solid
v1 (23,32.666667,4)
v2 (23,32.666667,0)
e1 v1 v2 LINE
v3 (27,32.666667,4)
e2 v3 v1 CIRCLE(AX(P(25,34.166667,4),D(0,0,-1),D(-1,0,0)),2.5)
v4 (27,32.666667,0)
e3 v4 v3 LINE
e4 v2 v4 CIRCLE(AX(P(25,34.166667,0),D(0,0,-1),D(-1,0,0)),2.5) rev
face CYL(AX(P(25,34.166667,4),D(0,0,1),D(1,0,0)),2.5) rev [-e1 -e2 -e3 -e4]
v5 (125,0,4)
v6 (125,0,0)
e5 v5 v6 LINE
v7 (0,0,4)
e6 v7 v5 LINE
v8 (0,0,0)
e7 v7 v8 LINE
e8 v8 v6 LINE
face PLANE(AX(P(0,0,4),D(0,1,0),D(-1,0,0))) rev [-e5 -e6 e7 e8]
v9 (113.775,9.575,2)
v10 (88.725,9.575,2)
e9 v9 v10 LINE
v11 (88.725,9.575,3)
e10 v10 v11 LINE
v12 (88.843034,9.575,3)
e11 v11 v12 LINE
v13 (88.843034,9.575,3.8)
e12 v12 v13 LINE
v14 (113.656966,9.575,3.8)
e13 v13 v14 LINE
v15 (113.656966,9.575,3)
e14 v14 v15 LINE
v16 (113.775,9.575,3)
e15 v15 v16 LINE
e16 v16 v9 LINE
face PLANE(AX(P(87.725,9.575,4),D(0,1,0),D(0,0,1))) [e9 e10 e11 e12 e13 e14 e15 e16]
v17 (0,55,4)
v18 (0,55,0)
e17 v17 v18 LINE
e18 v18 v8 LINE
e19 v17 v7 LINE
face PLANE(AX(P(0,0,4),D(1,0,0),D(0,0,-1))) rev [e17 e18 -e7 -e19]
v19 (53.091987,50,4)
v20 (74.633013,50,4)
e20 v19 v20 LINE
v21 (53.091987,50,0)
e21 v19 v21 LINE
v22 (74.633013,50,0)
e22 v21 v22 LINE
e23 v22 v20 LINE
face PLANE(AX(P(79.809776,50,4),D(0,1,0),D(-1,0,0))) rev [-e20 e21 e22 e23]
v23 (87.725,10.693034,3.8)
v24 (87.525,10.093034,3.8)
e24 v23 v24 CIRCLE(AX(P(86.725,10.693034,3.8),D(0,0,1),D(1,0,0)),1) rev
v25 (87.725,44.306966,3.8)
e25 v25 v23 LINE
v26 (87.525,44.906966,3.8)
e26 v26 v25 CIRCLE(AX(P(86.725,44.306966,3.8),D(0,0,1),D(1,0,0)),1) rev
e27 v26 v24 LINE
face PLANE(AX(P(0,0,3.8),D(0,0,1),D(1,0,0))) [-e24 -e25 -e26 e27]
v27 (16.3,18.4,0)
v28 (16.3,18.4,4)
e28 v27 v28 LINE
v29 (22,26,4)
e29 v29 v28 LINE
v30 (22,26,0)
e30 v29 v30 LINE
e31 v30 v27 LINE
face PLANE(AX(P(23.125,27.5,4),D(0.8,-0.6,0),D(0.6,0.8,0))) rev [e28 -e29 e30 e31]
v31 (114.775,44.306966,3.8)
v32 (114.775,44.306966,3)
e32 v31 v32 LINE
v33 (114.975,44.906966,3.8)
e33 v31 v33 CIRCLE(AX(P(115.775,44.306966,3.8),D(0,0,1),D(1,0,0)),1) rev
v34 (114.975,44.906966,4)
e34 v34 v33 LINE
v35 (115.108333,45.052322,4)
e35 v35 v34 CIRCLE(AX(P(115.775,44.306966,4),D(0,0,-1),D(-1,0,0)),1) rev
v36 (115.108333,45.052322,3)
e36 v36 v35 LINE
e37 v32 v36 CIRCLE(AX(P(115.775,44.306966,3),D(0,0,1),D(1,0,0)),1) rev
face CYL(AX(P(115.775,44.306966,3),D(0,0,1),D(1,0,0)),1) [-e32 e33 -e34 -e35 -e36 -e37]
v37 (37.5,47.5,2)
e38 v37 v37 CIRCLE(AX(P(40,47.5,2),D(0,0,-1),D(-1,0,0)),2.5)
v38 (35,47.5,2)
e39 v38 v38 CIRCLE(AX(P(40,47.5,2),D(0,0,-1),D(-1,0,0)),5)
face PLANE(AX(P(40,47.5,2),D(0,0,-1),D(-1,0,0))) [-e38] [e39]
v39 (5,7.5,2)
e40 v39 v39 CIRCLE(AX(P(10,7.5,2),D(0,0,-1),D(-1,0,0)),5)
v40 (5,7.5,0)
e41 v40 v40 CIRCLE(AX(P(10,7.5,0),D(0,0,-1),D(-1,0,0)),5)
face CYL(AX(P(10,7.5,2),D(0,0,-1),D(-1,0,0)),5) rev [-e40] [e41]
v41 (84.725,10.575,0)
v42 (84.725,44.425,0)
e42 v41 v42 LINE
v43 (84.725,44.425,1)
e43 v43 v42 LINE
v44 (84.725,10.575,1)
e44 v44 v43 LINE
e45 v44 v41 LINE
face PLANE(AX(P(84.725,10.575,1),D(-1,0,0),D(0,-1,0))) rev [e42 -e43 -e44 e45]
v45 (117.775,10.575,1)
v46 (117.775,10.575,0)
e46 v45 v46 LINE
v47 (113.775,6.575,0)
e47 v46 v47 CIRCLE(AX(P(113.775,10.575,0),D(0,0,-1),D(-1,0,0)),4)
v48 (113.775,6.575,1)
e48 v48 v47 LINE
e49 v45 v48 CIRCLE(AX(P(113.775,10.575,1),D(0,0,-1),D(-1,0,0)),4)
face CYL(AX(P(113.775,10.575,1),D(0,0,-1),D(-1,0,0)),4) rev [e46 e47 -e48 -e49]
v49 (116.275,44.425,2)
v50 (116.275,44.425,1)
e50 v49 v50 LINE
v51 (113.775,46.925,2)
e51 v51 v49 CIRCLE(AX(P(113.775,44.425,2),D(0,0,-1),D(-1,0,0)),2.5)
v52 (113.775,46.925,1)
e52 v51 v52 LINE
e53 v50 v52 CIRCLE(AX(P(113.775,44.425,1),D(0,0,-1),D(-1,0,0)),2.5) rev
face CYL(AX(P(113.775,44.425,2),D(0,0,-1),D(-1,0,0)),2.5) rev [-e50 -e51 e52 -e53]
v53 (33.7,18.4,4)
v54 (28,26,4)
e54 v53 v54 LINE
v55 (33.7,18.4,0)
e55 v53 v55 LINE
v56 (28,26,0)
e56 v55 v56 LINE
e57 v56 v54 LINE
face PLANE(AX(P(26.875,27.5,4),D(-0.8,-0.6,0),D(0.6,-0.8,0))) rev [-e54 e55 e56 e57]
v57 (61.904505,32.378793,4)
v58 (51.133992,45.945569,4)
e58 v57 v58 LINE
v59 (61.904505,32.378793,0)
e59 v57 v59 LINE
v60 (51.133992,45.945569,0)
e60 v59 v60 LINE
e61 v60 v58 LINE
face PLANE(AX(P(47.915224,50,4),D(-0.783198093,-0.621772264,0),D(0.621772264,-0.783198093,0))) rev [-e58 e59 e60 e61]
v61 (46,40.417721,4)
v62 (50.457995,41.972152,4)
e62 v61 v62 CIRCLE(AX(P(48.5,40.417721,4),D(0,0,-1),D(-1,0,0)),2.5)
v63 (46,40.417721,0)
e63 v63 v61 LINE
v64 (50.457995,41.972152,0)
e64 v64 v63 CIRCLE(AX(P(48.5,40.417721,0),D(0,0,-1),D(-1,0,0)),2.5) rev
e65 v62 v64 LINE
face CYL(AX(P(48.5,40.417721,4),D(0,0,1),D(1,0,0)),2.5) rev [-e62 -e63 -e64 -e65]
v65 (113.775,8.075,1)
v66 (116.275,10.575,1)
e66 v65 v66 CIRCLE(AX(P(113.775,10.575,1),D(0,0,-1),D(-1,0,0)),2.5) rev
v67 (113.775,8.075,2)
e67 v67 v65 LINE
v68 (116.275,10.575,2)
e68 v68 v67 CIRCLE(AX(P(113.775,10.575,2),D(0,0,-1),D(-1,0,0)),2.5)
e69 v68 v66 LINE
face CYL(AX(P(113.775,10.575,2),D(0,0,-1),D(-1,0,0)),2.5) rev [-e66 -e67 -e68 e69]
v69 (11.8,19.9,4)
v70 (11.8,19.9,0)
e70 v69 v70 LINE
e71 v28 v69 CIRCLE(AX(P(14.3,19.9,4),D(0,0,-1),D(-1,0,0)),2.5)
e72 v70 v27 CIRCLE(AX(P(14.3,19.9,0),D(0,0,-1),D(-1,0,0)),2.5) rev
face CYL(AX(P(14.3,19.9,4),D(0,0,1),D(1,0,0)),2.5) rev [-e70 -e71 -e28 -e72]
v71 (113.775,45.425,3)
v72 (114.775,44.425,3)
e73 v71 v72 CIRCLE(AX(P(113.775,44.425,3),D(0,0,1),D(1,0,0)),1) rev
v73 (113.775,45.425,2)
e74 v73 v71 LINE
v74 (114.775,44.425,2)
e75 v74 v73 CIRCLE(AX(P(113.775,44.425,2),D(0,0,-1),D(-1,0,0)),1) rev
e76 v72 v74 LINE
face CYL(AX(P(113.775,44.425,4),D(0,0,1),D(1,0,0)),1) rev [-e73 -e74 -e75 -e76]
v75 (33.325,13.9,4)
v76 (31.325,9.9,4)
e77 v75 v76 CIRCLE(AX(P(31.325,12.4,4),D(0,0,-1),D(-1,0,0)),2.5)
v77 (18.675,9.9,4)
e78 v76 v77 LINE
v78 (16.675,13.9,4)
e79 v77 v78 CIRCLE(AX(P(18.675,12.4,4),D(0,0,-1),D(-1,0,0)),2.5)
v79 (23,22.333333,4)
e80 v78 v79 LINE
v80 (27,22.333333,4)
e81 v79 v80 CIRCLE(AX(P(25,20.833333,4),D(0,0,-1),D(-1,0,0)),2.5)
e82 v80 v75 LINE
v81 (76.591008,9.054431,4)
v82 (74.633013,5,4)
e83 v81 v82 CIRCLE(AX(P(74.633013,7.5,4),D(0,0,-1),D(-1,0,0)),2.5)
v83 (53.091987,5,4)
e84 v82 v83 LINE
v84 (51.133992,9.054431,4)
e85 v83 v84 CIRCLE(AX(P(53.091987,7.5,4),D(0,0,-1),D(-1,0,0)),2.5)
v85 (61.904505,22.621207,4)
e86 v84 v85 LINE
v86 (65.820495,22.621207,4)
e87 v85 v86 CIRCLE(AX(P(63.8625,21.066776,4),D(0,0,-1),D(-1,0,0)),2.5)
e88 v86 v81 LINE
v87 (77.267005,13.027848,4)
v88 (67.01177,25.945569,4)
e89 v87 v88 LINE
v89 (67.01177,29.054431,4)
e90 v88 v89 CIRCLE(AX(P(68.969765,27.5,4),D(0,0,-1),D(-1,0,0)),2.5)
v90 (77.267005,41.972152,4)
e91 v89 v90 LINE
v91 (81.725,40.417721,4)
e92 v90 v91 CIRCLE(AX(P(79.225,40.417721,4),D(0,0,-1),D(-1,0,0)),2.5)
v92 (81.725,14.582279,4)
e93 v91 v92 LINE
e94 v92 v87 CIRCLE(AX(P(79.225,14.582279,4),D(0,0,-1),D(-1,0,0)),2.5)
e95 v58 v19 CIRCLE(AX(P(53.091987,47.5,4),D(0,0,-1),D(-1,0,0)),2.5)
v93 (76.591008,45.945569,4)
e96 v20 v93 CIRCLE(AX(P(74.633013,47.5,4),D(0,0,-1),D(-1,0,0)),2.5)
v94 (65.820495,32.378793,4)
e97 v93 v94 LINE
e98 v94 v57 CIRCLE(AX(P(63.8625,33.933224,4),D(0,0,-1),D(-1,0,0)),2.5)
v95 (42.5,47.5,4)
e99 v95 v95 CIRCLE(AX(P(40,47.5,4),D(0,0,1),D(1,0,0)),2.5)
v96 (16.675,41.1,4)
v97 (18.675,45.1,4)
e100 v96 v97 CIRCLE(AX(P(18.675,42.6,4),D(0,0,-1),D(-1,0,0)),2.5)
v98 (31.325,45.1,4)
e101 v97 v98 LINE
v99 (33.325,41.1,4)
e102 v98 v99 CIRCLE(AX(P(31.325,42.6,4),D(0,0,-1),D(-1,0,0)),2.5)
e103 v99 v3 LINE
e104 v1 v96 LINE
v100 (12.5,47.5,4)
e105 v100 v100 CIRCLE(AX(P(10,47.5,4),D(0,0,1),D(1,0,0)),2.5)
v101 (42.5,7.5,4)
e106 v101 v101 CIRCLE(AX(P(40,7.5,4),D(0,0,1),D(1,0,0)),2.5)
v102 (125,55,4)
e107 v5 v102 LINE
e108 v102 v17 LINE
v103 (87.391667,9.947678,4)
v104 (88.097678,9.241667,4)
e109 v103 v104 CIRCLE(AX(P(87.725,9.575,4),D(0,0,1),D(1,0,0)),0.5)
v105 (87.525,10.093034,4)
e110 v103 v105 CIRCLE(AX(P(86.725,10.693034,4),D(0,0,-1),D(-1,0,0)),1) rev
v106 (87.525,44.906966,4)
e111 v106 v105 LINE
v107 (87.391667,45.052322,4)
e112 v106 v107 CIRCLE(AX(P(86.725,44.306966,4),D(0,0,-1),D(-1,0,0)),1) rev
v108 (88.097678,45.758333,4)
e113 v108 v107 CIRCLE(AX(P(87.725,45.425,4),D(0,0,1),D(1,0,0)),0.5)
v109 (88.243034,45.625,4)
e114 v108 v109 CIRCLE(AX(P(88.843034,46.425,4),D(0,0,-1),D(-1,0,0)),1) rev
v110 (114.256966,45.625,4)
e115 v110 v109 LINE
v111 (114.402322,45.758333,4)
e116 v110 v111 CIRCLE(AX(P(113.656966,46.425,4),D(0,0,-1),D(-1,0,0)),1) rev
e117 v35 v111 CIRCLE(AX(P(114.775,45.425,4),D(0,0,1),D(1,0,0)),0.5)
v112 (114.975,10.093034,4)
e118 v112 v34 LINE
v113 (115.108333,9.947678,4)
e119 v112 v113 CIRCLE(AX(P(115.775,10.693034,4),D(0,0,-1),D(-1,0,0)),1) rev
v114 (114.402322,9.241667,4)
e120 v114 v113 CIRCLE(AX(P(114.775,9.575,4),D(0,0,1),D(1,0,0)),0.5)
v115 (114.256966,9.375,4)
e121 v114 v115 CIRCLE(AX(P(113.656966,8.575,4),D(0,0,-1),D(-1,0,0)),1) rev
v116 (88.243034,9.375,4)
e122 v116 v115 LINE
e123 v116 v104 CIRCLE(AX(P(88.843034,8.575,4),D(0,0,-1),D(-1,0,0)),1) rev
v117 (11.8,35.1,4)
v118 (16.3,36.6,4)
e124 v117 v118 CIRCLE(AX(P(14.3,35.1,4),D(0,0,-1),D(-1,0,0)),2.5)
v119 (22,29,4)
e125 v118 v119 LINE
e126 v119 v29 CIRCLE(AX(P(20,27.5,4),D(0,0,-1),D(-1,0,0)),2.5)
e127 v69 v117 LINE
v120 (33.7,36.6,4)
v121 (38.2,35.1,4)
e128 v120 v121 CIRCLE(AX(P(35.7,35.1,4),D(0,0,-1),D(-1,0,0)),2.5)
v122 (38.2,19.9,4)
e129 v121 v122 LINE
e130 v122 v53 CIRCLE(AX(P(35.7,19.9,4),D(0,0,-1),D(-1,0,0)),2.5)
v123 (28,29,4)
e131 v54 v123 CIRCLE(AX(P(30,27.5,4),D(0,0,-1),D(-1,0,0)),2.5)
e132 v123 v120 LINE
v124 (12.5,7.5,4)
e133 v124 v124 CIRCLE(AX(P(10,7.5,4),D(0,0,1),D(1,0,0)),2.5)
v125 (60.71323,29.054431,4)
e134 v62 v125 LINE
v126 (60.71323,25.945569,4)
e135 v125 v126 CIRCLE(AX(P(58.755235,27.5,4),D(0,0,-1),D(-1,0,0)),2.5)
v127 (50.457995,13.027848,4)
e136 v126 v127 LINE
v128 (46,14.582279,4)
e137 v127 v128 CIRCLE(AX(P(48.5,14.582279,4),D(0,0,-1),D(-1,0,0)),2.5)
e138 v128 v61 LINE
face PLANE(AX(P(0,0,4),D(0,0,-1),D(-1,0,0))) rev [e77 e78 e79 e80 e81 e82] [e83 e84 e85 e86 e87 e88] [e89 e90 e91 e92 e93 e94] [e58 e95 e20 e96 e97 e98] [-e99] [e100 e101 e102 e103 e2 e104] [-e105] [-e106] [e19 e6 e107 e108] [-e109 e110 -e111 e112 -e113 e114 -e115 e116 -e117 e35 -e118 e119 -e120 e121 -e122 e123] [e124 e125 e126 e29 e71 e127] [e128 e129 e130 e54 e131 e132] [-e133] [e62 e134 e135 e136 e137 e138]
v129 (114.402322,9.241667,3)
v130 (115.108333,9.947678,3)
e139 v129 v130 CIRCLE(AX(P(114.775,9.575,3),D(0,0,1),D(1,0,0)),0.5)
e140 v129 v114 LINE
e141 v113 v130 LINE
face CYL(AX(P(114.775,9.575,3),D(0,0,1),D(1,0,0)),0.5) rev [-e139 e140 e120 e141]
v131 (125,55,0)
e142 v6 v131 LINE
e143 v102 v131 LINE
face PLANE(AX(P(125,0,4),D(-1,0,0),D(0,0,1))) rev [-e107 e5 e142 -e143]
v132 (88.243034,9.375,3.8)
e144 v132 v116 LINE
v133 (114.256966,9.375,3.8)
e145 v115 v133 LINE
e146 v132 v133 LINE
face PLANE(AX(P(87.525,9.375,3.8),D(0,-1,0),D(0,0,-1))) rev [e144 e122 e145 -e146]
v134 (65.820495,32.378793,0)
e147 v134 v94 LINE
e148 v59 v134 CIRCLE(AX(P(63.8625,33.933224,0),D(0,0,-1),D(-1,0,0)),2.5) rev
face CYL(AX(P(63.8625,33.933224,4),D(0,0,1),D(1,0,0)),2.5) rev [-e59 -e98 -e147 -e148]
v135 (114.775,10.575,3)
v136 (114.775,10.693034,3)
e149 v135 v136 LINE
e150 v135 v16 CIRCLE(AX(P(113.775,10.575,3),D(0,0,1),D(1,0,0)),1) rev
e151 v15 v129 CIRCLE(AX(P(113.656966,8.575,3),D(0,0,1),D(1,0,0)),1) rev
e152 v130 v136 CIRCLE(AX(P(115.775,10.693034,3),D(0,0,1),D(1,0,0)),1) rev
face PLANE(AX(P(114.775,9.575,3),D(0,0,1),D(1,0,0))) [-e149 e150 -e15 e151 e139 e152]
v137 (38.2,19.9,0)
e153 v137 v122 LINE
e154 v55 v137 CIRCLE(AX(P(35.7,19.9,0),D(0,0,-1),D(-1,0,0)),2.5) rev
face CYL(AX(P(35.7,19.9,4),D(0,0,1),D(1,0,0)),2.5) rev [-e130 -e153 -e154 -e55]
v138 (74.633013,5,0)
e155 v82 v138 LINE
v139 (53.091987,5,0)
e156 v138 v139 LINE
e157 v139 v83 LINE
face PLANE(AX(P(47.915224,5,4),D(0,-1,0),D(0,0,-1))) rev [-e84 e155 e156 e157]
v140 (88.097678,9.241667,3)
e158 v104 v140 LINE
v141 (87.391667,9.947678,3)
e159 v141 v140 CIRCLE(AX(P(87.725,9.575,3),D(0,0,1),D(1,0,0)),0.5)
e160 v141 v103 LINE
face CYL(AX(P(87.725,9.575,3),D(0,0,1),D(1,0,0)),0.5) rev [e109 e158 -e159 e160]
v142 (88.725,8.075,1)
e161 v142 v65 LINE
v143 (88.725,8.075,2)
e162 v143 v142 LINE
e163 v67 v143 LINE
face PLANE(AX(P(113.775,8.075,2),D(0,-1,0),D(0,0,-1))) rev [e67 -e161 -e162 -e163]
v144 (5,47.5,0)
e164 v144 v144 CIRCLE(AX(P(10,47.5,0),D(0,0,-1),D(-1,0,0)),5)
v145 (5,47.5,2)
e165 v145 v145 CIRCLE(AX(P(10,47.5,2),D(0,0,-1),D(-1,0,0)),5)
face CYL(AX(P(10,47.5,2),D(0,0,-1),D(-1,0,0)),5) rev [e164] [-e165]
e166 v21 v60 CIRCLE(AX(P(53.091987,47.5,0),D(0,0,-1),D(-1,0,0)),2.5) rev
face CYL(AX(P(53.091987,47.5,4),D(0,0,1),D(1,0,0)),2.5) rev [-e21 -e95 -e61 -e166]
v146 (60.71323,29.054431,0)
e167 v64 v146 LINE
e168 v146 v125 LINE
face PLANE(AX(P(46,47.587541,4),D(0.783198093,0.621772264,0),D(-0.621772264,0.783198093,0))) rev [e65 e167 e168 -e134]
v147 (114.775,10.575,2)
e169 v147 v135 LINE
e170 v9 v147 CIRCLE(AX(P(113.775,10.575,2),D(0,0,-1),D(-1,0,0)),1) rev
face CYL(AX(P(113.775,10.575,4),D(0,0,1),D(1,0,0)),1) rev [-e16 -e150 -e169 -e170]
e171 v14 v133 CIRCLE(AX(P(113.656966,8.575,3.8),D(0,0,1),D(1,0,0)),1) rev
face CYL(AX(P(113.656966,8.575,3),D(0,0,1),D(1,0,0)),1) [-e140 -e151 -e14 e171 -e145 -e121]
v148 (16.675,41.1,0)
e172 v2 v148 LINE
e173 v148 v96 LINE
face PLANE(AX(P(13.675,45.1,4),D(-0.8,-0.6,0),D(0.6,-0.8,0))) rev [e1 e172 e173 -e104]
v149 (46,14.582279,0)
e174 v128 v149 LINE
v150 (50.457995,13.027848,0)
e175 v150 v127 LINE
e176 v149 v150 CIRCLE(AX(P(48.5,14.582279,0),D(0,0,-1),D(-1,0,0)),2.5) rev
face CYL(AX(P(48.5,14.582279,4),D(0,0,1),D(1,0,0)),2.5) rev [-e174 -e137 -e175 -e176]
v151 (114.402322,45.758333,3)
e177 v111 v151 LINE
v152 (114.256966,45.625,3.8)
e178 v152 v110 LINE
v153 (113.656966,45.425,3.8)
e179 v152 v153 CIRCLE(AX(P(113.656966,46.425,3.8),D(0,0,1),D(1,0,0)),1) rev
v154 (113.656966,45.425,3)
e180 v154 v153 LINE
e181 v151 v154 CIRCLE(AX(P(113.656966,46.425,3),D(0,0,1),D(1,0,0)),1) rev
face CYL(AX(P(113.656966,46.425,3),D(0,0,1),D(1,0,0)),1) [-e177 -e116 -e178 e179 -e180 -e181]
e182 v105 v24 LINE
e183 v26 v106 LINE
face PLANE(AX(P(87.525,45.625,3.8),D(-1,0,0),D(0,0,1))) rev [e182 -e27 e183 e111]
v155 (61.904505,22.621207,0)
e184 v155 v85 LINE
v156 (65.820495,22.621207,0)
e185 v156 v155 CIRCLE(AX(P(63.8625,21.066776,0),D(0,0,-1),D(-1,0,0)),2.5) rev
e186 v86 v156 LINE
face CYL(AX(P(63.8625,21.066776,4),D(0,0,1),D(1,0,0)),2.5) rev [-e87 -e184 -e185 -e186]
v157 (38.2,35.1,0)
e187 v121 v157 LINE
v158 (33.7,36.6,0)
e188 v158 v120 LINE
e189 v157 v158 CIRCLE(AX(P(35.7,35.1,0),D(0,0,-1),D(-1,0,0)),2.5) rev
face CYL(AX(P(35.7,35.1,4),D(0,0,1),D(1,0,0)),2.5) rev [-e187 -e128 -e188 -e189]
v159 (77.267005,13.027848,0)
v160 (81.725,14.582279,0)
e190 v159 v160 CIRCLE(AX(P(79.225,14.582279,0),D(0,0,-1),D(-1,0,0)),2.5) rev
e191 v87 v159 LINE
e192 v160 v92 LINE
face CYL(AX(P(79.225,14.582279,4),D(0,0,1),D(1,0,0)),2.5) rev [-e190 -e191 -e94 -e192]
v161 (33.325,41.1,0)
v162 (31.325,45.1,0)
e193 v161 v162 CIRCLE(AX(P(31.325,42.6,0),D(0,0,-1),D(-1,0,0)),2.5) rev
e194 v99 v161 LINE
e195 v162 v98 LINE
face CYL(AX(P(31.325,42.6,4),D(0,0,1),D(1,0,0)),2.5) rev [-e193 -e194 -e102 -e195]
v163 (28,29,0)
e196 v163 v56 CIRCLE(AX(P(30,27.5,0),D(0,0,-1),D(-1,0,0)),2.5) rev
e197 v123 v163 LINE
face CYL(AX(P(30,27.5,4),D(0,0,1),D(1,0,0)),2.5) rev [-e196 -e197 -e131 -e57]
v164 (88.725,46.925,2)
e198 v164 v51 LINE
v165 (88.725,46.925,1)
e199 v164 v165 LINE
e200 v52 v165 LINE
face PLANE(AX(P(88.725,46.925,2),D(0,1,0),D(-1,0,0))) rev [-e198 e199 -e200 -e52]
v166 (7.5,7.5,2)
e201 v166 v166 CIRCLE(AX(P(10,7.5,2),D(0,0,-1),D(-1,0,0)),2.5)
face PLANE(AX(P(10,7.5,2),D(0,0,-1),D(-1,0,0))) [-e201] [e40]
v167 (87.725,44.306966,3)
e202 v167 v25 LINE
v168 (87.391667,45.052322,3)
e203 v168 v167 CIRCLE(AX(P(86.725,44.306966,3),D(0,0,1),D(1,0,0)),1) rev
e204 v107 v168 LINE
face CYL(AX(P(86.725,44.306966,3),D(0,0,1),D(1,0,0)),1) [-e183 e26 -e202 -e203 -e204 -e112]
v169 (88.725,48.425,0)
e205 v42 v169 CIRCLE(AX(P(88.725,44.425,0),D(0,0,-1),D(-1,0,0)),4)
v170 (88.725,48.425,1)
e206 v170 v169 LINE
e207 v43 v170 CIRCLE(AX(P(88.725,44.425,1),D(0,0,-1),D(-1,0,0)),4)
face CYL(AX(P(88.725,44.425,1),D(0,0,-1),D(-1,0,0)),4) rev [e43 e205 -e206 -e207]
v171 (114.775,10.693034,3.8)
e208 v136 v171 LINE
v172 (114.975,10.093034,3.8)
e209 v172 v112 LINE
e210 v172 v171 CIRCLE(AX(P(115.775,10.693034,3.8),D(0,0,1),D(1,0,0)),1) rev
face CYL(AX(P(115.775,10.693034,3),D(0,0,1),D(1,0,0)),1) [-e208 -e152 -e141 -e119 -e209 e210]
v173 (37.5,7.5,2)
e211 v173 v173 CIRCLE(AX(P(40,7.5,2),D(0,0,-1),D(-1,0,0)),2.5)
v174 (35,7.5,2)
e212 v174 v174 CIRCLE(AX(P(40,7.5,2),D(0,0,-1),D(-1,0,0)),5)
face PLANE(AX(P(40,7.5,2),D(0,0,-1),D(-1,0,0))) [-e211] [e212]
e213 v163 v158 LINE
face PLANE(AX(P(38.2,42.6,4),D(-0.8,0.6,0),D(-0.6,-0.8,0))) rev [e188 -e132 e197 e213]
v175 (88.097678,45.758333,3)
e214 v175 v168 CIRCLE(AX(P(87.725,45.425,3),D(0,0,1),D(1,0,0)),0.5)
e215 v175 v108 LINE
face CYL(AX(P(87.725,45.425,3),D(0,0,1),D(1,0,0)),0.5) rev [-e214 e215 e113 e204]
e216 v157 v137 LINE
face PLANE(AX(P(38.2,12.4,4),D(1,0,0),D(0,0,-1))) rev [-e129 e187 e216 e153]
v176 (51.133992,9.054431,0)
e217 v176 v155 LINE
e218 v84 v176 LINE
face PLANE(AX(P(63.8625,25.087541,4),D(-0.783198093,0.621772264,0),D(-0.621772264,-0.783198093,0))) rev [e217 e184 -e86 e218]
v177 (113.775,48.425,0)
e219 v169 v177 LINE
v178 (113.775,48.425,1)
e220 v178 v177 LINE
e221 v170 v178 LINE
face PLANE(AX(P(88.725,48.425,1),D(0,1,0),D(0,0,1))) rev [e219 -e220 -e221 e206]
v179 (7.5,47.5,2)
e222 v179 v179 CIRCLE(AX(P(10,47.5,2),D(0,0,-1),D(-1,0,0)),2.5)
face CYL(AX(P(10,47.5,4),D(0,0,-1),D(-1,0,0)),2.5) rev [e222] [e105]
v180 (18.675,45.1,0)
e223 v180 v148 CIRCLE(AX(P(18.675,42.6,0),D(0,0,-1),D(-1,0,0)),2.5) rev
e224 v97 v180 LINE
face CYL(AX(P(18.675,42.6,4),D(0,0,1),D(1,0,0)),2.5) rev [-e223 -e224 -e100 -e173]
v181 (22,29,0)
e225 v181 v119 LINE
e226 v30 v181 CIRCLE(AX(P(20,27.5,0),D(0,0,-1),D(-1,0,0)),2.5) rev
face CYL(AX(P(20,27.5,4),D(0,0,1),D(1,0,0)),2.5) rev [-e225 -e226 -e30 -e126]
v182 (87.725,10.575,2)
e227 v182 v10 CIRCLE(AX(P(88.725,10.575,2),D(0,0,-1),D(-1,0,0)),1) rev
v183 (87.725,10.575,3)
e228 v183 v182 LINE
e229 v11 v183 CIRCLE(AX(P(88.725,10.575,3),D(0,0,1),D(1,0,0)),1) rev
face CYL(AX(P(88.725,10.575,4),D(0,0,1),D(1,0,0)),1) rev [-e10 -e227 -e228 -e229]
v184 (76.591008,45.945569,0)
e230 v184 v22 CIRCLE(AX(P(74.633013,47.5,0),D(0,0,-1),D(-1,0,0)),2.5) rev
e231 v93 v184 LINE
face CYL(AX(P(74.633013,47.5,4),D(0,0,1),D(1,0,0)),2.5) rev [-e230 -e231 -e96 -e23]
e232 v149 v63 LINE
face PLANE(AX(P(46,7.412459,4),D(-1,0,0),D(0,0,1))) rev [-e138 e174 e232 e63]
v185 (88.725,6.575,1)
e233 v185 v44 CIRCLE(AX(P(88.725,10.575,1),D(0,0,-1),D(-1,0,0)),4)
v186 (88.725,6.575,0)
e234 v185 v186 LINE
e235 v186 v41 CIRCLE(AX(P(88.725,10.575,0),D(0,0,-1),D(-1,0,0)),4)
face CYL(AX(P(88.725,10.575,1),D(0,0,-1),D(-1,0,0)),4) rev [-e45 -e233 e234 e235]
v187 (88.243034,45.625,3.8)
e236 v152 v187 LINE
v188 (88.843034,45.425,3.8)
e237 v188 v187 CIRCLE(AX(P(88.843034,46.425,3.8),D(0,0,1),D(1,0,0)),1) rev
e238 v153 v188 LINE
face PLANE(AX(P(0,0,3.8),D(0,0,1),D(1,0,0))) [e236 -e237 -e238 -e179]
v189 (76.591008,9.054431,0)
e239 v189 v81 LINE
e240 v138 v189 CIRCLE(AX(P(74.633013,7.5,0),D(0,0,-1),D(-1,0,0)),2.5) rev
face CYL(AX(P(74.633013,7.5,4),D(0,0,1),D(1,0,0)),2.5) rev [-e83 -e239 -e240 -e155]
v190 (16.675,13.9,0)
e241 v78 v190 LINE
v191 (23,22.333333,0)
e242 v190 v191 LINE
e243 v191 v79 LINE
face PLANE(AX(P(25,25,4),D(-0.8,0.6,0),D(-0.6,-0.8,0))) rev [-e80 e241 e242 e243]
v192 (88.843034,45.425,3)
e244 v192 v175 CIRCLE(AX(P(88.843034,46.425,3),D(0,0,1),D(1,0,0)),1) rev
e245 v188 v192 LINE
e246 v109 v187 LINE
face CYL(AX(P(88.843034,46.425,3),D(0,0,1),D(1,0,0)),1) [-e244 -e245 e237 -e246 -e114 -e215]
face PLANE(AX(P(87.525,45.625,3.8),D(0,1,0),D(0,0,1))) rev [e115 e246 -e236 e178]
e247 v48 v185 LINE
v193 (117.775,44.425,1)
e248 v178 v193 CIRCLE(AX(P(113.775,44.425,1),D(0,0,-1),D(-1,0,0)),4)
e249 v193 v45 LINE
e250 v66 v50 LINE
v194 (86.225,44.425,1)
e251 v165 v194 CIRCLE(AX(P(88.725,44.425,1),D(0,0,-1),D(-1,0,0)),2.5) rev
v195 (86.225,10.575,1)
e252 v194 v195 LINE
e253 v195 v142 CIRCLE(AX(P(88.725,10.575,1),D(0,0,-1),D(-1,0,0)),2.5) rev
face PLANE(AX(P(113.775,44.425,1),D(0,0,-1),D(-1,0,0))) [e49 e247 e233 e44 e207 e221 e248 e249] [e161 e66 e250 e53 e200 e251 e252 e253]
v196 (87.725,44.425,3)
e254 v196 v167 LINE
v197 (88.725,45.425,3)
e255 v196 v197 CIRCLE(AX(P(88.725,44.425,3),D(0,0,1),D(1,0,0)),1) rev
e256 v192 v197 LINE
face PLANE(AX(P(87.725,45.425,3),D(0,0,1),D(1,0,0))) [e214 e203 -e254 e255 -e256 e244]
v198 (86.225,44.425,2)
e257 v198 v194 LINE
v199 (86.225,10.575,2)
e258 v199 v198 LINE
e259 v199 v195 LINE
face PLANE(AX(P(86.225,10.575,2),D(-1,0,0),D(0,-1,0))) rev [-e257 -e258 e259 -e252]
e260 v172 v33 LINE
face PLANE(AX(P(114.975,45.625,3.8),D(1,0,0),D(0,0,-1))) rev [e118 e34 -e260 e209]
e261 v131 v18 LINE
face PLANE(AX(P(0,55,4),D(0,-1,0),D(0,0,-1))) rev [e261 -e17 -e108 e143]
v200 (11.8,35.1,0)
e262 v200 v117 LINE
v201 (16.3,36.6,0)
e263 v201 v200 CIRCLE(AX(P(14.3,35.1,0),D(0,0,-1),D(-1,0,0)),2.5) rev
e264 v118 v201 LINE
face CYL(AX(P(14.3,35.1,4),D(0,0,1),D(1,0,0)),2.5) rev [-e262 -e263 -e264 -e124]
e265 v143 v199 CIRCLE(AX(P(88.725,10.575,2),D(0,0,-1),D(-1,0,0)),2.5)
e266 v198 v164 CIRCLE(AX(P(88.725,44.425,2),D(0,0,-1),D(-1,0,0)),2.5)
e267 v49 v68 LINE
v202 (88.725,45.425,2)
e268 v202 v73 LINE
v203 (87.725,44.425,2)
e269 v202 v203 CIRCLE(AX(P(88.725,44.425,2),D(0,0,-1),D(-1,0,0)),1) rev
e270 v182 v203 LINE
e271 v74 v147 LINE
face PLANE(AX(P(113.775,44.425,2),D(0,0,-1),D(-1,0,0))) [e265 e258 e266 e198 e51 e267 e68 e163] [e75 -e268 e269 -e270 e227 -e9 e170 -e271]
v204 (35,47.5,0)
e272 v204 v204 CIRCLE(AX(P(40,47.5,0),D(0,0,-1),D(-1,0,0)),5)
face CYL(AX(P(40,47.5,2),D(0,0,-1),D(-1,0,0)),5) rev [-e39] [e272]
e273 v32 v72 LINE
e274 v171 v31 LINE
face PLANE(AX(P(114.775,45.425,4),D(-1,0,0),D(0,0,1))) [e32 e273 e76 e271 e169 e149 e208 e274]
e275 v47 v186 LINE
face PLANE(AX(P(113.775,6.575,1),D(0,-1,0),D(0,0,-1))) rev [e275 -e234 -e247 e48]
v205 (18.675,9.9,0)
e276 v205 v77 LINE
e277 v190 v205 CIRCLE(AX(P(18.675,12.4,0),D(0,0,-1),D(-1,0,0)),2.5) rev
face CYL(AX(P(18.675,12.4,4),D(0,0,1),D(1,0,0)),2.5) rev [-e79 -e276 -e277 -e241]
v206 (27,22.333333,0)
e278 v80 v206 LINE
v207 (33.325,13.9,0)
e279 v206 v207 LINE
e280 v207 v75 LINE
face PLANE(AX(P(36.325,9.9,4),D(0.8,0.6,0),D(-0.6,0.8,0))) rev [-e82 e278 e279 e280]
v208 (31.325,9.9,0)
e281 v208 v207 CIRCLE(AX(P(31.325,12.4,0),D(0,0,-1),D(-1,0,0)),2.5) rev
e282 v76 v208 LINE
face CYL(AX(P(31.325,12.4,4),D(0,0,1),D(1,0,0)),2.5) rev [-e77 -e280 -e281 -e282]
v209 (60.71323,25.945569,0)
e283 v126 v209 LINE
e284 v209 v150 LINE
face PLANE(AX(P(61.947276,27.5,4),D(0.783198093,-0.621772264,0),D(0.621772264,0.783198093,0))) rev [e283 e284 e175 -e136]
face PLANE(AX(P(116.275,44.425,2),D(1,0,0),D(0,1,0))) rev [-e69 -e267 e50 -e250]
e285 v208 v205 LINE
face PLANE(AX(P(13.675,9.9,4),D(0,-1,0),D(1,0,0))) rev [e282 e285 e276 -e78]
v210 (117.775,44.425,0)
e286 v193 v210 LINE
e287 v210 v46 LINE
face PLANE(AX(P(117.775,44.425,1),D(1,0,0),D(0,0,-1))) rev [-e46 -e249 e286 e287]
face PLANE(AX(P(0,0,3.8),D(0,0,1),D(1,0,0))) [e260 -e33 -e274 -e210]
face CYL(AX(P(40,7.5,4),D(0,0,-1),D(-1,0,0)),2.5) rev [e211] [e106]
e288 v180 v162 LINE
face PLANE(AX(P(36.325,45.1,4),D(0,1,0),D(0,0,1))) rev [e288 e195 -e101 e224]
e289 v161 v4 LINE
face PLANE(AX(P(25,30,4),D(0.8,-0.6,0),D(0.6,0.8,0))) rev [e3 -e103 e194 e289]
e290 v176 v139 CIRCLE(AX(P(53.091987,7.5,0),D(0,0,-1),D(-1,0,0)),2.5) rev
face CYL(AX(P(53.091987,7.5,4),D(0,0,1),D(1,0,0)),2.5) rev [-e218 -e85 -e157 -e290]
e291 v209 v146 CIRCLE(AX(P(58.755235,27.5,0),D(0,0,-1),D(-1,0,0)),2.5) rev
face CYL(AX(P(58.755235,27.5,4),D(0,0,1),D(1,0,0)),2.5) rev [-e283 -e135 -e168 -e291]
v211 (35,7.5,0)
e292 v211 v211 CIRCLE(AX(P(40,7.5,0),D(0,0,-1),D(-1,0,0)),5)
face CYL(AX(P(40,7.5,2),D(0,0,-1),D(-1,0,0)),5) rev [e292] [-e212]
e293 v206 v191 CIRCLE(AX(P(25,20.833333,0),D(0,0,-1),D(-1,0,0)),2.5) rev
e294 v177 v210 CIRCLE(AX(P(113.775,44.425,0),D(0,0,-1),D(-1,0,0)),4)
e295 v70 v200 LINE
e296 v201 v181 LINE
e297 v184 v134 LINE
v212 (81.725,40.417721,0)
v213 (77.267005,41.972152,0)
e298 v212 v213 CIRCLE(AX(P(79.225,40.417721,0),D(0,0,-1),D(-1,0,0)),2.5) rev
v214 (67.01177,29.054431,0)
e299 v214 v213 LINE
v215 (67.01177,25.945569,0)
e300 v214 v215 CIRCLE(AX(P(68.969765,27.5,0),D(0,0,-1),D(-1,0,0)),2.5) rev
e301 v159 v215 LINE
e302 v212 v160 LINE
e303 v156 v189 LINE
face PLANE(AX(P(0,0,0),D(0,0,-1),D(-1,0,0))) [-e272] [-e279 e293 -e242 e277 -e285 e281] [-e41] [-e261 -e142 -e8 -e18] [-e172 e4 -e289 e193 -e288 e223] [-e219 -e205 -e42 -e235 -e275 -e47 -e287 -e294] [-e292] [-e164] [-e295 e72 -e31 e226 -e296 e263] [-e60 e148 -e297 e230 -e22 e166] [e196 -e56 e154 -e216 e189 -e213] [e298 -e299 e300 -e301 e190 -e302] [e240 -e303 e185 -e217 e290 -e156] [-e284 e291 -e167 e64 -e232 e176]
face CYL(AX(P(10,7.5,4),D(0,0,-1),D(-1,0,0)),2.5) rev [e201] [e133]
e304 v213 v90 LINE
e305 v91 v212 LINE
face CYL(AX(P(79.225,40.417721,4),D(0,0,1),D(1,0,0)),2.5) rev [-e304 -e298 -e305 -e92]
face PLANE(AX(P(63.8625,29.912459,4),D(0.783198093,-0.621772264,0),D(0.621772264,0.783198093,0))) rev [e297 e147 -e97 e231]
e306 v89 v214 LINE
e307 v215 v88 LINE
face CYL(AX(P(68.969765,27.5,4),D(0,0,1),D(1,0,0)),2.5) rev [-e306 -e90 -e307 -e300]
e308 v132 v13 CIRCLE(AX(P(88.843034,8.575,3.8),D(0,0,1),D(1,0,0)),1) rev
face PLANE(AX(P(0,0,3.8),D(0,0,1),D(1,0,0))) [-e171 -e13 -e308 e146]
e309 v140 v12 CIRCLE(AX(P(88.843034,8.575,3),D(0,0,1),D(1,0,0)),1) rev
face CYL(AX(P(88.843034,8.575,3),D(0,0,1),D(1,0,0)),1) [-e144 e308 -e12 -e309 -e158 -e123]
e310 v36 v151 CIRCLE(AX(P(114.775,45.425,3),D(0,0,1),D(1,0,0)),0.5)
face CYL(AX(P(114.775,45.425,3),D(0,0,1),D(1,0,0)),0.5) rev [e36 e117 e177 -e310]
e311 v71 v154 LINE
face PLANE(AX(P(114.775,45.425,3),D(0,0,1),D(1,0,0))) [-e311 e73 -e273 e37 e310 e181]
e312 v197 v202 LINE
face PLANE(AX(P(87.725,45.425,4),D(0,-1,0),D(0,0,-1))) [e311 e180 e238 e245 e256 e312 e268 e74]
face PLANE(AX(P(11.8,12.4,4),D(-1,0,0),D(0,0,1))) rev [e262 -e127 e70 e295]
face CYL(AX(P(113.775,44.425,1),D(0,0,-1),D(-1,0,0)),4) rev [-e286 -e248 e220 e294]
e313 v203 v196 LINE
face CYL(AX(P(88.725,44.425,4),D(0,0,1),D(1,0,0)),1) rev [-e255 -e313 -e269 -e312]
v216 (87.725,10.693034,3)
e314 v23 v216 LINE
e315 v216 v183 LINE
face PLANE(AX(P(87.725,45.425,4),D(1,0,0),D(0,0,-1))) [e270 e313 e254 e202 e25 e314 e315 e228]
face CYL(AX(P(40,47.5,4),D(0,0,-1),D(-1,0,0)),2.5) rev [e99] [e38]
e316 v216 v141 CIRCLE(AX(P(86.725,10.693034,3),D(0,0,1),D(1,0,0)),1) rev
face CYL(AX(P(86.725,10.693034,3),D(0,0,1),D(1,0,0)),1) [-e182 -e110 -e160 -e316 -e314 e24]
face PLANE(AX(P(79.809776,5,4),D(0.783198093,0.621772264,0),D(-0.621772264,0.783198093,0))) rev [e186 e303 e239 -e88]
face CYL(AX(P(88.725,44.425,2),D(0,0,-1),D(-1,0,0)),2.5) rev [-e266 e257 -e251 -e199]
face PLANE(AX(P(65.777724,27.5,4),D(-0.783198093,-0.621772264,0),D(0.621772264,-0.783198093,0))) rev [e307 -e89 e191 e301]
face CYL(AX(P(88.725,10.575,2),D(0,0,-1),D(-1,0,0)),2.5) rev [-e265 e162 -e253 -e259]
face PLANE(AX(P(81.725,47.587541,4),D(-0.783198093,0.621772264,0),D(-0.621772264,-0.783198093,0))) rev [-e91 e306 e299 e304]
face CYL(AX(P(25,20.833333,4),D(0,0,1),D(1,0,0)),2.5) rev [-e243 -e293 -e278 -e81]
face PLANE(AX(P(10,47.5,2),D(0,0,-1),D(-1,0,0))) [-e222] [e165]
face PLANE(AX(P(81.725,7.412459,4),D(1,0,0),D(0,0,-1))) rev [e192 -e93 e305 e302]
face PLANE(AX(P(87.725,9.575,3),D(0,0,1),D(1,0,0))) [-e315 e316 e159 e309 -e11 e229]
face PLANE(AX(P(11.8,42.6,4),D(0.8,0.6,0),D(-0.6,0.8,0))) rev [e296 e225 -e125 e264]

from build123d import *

# Parameters (mm, degrees)
SKETCH1_W           = 125
SKETCH1_H           = 55
SKETCH1_R           = 2.5
SKETCH1_W_2         = 27.05
SKETCH1_H_2         = 35.85
BOSS_EXTRUDE1_DEPTH = 4
SKETCH2_R           = 0.5
CUT_EXTRUDE1_DEPTH  = 1
FILLET1_R           = 1
FILLET2_R           = 1
SKETCH7_W           = 27.45
SKETCH7_H           = 36.25
CUT_EXTRUDE2_DEPTH  = 0.2
CUT_EXTRUDE3_DEPTH  = 2
CUT_EXTRUDE4_DEPTH  = 1
CUT_EXTRUDE5_DEPTH  = 137.623570441
CUT_EXTRUDE6_DEPTH  = 137.623570441
FILLET3_R           = 2.5
SKETCH12_R          = 5
CUT_EXTRUDE7_DEPTH  = 2


with BuildPart() as part:
    # Sketch1 → Boss-Extrude1 (new body)
    with BuildSketch(Plane.XY):
        with Locations((62.5, 27.5)):
            Rectangle(SKETCH1_W, SKETCH1_H)
        with Locations((10, 47.5)):
            Circle(SKETCH1_R, mode=Mode.SUBTRACT)
        with Locations((40, 47.5)):
            Circle(SKETCH1_R, mode=Mode.SUBTRACT)
        with Locations((10, 7.5)):
            Circle(SKETCH1_R, mode=Mode.SUBTRACT)
        with Locations((40, 7.5)):
            Circle(SKETCH1_R, mode=Mode.SUBTRACT)
        with Locations((101.25, 27.5)):
            Rectangle(SKETCH1_W_2, SKETCH1_H_2, mode=Mode.SUBTRACT)
    extrude(amount=BOSS_EXTRUDE1_DEPTH)

    # Sketch2 → Cut-Extrude1 (cut)
    with BuildSketch(Plane.XY.offset(4)):
        with Locations((87.725, 45.425)):
            Circle(SKETCH2_R)
        with Locations((114.775, 45.425)):
            Circle(SKETCH2_R)
        with Locations((87.725, 9.575)):
            Circle(SKETCH2_R)
        with Locations((114.775, 9.575)):
            Circle(SKETCH2_R)
    extrude(amount=-CUT_EXTRUDE1_DEPTH, mode=Mode.SUBTRACT)

    # Fillet1
    # the kernel refuses this fillet: 1 mm, written as the material it adds along each edge
    with BuildSketch(Plane(origin=(114.775, 9.575, 0), x_dir=(-1, 0, 0), z_dir=(0, 0, 1))) as fillet1_piece_1_section:
        with BuildLine():
            CenterArc((FILLET1_R, -FILLET1_R), FILLET1_R, 90, 90)
            Line((0, -FILLET1_R), (0, 0))
            Line((0, 0), (FILLET1_R, 0))
        make_face()
    fillet1_piece_1 = extrude(amount=5.5, mode=Mode.PRIVATE)
    fillet1_piece_1 = split(fillet1_piece_1, bisect_by=Plane(origin=(114.157064257, 9.617383677, 4), z_dir=(0, 0, -1)), keep=Keep.TOP, mode=Mode.PRIVATE)
    fillet1_piece_1 = fillet1_piece_1 - Plane(origin=(114.775, 9.575, 1.5), x_dir=(1, 0, 0), z_dir=(0, 0, 1)) * Cylinder(0.5, 16, mode=Mode.PRIVATE)
    add(fillet1_piece_1)
    with BuildSketch(Plane(origin=(114.775, 9.575, 0), x_dir=(-1, 0, 0), z_dir=(0, 0, 1)), Plane(origin=(87.725, 9.575, 0), x_dir=(0, 1, 0), z_dir=(0, 0, 1)), Plane(origin=(114.775, 45.425, 0), x_dir=(0, -1, 0), z_dir=(0, 0, 1))) as fillet1_piece_2:
        with BuildLine():
            CenterArc((FILLET1_R, -FILLET1_R), FILLET1_R, 90, 90)
            Line((0, -FILLET1_R), (0, 0))
            Line((0, 0), (FILLET1_R, 0))
        make_face()
    extrude(amount=3)
    with BuildSketch(Plane(origin=(87.725, 9.575, 0), x_dir=(0, 1, 0), z_dir=(0, 0, 1))) as fillet1_piece_3_section:
        with BuildLine():
            CenterArc((FILLET1_R, -FILLET1_R), FILLET1_R, 90, 90)
            Line((0, -FILLET1_R), (0, 0))
            Line((0, 0), (FILLET1_R, 0))
        make_face()
    fillet1_piece_3 = extrude(amount=5.5, mode=Mode.PRIVATE)
    fillet1_piece_3 = split(fillet1_piece_3, bisect_by=Plane(origin=(87.767383677, 10.192935743, 4), z_dir=(0, 0, -1)), keep=Keep.TOP, mode=Mode.PRIVATE)
    fillet1_piece_3 = fillet1_piece_3 - Plane(origin=(87.725, 9.575, 1.5), x_dir=(1, 0, 0), z_dir=(0, 0, 1)) * Cylinder(0.5, 15, mode=Mode.PRIVATE)
    add(fillet1_piece_3)
    with BuildSketch(Plane(origin=(114.775, 45.425, 0), x_dir=(0, -1, 0), z_dir=(0, 0, 1))) as fillet1_piece_4_section:
        with BuildLine():
            CenterArc((FILLET1_R, -FILLET1_R), FILLET1_R, 90, 90)
            Line((0, -FILLET1_R), (0, 0))
            Line((0, 0), (FILLET1_R, 0))
        make_face()
    fillet1_piece_4 = extrude(amount=5.5, mode=Mode.PRIVATE)
    fillet1_piece_4 = split(fillet1_piece_4, bisect_by=Plane(origin=(114.732616323, 44.807064257, 4), z_dir=(0, 0, -1)), keep=Keep.TOP, mode=Mode.PRIVATE)
    fillet1_piece_4 = fillet1_piece_4 - Plane(origin=(114.775, 45.425, 1.5), x_dir=(1, 0, 0), z_dir=(0, 0, 1)) * Cylinder(0.5, 15, mode=Mode.PRIVATE)
    add(fillet1_piece_4)
    with BuildSketch(Plane(origin=(87.725, 45.425, 0), x_dir=(0, -1, 0), z_dir=(0, 0, 1))) as fillet1_piece_5_section:
        with BuildLine():
            CenterArc((FILLET1_R, FILLET1_R), FILLET1_R, 180, 90)
            Line((0, FILLET1_R), (0, 0))
            Line((0, 0), (FILLET1_R, 0))
        make_face()
    fillet1_piece_5 = extrude(amount=5.5, mode=Mode.PRIVATE)
    fillet1_piece_5 = split(fillet1_piece_5, bisect_by=Plane(origin=(87.767383677, 44.807064257, 4), z_dir=(0, 0, -1)), keep=Keep.TOP, mode=Mode.PRIVATE)
    fillet1_piece_5 = fillet1_piece_5 - Plane(origin=(87.725, 45.425, 1.5), x_dir=(1, 0, 0), z_dir=(0, 0, 1)) * Cylinder(0.5, 16, mode=Mode.PRIVATE)
    add(fillet1_piece_5)
    with BuildSketch(Plane(origin=(87.725, 45.425, 0), x_dir=(0, -1, 0), z_dir=(0, 0, 1))) as fillet1_piece_6:
        with BuildLine():
            CenterArc((FILLET1_R, FILLET1_R), FILLET1_R, 180, 90)
            Line((0, FILLET1_R), (0, 0))
            Line((0, 0), (FILLET1_R, 0))
        make_face()
    extrude(amount=3)

    # Fillet2
    # the kernel refuses this fillet: 1 mm, written as the material it takes off along each edge
    with BuildSketch(Plane(origin=(114.297140543, 9.722140543, 5.642166577), x_dir=(-0.9745882982080014, -0.22400368076447263, 0), z_dir=(0, 0, -1)), Plane(origin=(87.872140543, 10.052859457, 5.642166577), x_dir=(-0.22400368076451274, 0.9745882982079922, 0), z_dir=(0, 0, -1)), Plane(origin=(114.627859457, 44.947140543, 5.642166577), x_dir=(0.22400368076446278, -0.9745882982080036, 0), z_dir=(0, 0, -1)), Plane(origin=(88.202859457, 45.277859457, 5.642166577), x_dir=(0.974588298207998, 0.22400368076448807, 0), z_dir=(0, 0, -1))) as fillet2_piece_1:
        with BuildLine():
            CenterArc((0.880870312, -0.974588298), FILLET2_R, 102.944297934, 48.189685104)
            Line((0.005119296, -0.491825252), (-0.082455806, -0.443548947))
            ThreePointArc((-0.082455806, -0.443548947), (-0.032777878, -0.246280446), (-0.086551242, -0.050088746))
            Line((-0.086551242, -0.050088746), (0.031782841, 0.094814825))
            ThreePointArc((0.031782841, 0.094814825), (0.519431718, 0.071018782), (0.634466263, 0.09745883))
            Line((0.634466263, 0.09745883), (0.656866631, 0))
        make_face()
    extrude(amount=2.642166577, mode=Mode.SUBTRACT)
    with BuildSketch(Plane(origin=(114.627859457, 10.052859457, 5.642166577), x_dir=(0.22400368076446103, 0.9745882982080041, 0), z_dir=(0, 0, -1)), Plane(origin=(88.202859457, 9.722140543, 5.642166577), x_dir=(0.9745882982080036, -0.22400368076446323, 0), z_dir=(0, 0, -1)), Plane(origin=(114.297140543, 45.277859457, 5.642166577), x_dir=(-0.974588298207998, 0.22400368076448807, 0), z_dir=(0, 0, -1)), Plane(origin=(87.872140543, 44.947140543, 5.642166577), x_dir=(-0.22400368076451097, -0.9745882982079925, 0), z_dir=(0, 0, -1))) as fillet2_piece_2:
        with BuildLine():
            CenterArc((0.880870312, 0.974588298), FILLET2_R, 208.866016962, 48.189685104)
            Line((0.005119296, 0.491825252), (-0.082455806, 0.443548947))
            ThreePointArc((-0.082455806, 0.443548947), (-0.032777878, 0.246280446), (-0.086551242, 0.050088746))
            Line((-0.086551242, 0.050088746), (0.031782841, -0.094814825))
            ThreePointArc((0.031782841, -0.094814825), (0.519431718, -0.071018782), (0.634466263, -0.09745883))
            Line((0.634466263, -0.09745883), (0.656866631, 0))
        make_face()
    extrude(amount=2.642166577, mode=Mode.SUBTRACT)

    # Sketch7 → Cut-Extrude2 (cut)
    with BuildSketch(Plane.XY.offset(4)):
        with Locations((101.25, 27.5)):
            Rectangle(SKETCH7_W, SKETCH7_H)
    extrude(amount=-CUT_EXTRUDE2_DEPTH, mode=Mode.SUBTRACT)

    # Sketch8 → Cut-Extrude3 (cut)
    with BuildSketch(Plane(origin=(0, 0, 0), x_dir=(-1, 0, 0), z_dir=(0, 0, -1))):
        with BuildLine():
            Line((-116.275, 44.425), (-116.275, 10.575))
            ThreePointArc((-116.275, 10.575), (-115.542766953, 8.807233047), (-113.775, 8.075))
            Line((-113.775, 8.075), (-88.725, 8.075))
            ThreePointArc((-88.725, 8.075), (-86.957233047, 8.807233047), (-86.225, 10.575))
            Line((-86.225, 10.575), (-86.225, 44.425))
            ThreePointArc((-86.225, 44.425), (-86.957233047, 46.192766953), (-88.725, 46.925))
            Line((-88.725, 46.925), (-113.775, 46.925))
            ThreePointArc((-113.775, 46.925), (-115.542766953, 46.192766953), (-116.275, 44.425))
        make_face()
    extrude(amount=-CUT_EXTRUDE3_DEPTH, mode=Mode.SUBTRACT)

    # Sketch9 → Cut-Extrude4 (cut)
    with BuildSketch(Plane(origin=(0, 0, 0), x_dir=(-1, 0, 0), z_dir=(0, 0, -1))):
        with BuildLine():
            Line((-117.775, 44.425), (-117.775, 10.575))
            ThreePointArc((-117.775, 10.575), (-116.603427125, 7.746572875), (-113.775, 6.575))
            Line((-113.775, 6.575), (-88.725, 6.575))
            ThreePointArc((-88.725, 6.575), (-85.896572875, 7.746572875), (-84.725, 10.575))
            Line((-84.725, 10.575), (-84.725, 44.425))
            ThreePointArc((-84.725, 44.425), (-85.896572875, 47.253427125), (-88.725, 48.425))
            Line((-88.725, 48.425), (-113.775, 48.425))
            ThreePointArc((-113.775, 48.425), (-116.603427125, 47.253427125), (-117.775, 44.425))
        make_face()
    extrude(amount=-CUT_EXTRUDE4_DEPTH, mode=Mode.SUBTRACT)

    # Sketch10 → Cut-Extrude5 (cut, through all)
    with BuildSketch(Plane(origin=(0, 0, 0), x_dir=(-1, 0, 0), z_dir=(0, 0, -1))):
        Polygon((-38.2, 42.6), (-26.875, 27.5), (-38.2, 12.4), align=None)
        Polygon((-36.325, 45.1), (-13.675, 45.1), (-25, 30), align=None)
        Polygon((-36.325, 9.9), (-25, 25), (-13.675, 9.9), align=None)
        Polygon((-11.8, 42.6), (-23.125, 27.5), (-11.8, 12.4), align=None)
    extrude(amount=-CUT_EXTRUDE5_DEPTH, mode=Mode.SUBTRACT)

    # Sketch11 → Cut-Extrude6 (cut, through all)
    with BuildSketch(Plane(origin=(0, 0, 0), x_dir=(-1, 0, 0), z_dir=(0, 0, -1))):
        Polygon((-81.725, 47.58754115), (-65.777724276, 27.5), (-81.725, 7.41245885), align=None)
        Polygon((-79.809775724, 50), (-47.915224276, 50), (-63.8625, 29.91245885), align=None)
        Polygon((-79.809775724, 5), (-63.8625, 25.08754115), (-47.915224276, 5), align=None)
        Polygon((-46, 47.58754115), (-61.947275724, 27.5), (-46, 7.41245885), align=None)
    extrude(amount=-CUT_EXTRUDE6_DEPTH, mode=Mode.SUBTRACT)

    # Fillet3
    fillet3_edges = [part.edges().sort_by_distance(p)[0] for p in [
        (25, 30, 2),
        (36.325, 45.1, 2),
        (13.675, 45.1, 2),
        (13.675, 9.9, 2),
        (36.325, 9.9, 2),
        (25, 25, 2),
        (11.8, 42.6, 2),
        (11.8, 12.4, 2),
        (23.125, 27.5, 2),
        (38.2, 12.4, 2),
        (38.2, 42.6, 2),
        (26.875, 27.5, 2),
        (63.8625, 29.91245885, 2),
        (79.809775724, 50, 2),
        (47.915224276, 50, 2),
        (47.915224276, 5, 2),
        (79.809775724, 5, 2),
        (63.8625, 25.08754115, 2),
        (46, 47.58754115, 2),
        (46, 7.41245885, 2),
        (61.947275724, 27.5, 2),
        (81.725, 7.41245885, 2),
        (81.725, 47.58754115, 2),
        (65.777724276, 27.5, 2),
    ]]
    fillet(fillet3_edges, radius=FILLET3_R)

    # Sketch12 → Cut-Extrude7 (cut)
    with BuildSketch(Plane(origin=(0, 0, 0), x_dir=(-1, 0, 0), z_dir=(0, 0, -1))):
        with Locations((-40, 47.5)):
            Circle(SKETCH12_R)
        with Locations((-10, 47.5)):
            Circle(SKETCH12_R)
        with Locations((-40, 7.5)):
            Circle(SKETCH12_R)
        with Locations((-10, 7.5)):
            Circle(SKETCH12_R)
    extrude(amount=-CUT_EXTRUDE7_DEPTH, mode=Mode.SUBTRACT)


solid = part.part
